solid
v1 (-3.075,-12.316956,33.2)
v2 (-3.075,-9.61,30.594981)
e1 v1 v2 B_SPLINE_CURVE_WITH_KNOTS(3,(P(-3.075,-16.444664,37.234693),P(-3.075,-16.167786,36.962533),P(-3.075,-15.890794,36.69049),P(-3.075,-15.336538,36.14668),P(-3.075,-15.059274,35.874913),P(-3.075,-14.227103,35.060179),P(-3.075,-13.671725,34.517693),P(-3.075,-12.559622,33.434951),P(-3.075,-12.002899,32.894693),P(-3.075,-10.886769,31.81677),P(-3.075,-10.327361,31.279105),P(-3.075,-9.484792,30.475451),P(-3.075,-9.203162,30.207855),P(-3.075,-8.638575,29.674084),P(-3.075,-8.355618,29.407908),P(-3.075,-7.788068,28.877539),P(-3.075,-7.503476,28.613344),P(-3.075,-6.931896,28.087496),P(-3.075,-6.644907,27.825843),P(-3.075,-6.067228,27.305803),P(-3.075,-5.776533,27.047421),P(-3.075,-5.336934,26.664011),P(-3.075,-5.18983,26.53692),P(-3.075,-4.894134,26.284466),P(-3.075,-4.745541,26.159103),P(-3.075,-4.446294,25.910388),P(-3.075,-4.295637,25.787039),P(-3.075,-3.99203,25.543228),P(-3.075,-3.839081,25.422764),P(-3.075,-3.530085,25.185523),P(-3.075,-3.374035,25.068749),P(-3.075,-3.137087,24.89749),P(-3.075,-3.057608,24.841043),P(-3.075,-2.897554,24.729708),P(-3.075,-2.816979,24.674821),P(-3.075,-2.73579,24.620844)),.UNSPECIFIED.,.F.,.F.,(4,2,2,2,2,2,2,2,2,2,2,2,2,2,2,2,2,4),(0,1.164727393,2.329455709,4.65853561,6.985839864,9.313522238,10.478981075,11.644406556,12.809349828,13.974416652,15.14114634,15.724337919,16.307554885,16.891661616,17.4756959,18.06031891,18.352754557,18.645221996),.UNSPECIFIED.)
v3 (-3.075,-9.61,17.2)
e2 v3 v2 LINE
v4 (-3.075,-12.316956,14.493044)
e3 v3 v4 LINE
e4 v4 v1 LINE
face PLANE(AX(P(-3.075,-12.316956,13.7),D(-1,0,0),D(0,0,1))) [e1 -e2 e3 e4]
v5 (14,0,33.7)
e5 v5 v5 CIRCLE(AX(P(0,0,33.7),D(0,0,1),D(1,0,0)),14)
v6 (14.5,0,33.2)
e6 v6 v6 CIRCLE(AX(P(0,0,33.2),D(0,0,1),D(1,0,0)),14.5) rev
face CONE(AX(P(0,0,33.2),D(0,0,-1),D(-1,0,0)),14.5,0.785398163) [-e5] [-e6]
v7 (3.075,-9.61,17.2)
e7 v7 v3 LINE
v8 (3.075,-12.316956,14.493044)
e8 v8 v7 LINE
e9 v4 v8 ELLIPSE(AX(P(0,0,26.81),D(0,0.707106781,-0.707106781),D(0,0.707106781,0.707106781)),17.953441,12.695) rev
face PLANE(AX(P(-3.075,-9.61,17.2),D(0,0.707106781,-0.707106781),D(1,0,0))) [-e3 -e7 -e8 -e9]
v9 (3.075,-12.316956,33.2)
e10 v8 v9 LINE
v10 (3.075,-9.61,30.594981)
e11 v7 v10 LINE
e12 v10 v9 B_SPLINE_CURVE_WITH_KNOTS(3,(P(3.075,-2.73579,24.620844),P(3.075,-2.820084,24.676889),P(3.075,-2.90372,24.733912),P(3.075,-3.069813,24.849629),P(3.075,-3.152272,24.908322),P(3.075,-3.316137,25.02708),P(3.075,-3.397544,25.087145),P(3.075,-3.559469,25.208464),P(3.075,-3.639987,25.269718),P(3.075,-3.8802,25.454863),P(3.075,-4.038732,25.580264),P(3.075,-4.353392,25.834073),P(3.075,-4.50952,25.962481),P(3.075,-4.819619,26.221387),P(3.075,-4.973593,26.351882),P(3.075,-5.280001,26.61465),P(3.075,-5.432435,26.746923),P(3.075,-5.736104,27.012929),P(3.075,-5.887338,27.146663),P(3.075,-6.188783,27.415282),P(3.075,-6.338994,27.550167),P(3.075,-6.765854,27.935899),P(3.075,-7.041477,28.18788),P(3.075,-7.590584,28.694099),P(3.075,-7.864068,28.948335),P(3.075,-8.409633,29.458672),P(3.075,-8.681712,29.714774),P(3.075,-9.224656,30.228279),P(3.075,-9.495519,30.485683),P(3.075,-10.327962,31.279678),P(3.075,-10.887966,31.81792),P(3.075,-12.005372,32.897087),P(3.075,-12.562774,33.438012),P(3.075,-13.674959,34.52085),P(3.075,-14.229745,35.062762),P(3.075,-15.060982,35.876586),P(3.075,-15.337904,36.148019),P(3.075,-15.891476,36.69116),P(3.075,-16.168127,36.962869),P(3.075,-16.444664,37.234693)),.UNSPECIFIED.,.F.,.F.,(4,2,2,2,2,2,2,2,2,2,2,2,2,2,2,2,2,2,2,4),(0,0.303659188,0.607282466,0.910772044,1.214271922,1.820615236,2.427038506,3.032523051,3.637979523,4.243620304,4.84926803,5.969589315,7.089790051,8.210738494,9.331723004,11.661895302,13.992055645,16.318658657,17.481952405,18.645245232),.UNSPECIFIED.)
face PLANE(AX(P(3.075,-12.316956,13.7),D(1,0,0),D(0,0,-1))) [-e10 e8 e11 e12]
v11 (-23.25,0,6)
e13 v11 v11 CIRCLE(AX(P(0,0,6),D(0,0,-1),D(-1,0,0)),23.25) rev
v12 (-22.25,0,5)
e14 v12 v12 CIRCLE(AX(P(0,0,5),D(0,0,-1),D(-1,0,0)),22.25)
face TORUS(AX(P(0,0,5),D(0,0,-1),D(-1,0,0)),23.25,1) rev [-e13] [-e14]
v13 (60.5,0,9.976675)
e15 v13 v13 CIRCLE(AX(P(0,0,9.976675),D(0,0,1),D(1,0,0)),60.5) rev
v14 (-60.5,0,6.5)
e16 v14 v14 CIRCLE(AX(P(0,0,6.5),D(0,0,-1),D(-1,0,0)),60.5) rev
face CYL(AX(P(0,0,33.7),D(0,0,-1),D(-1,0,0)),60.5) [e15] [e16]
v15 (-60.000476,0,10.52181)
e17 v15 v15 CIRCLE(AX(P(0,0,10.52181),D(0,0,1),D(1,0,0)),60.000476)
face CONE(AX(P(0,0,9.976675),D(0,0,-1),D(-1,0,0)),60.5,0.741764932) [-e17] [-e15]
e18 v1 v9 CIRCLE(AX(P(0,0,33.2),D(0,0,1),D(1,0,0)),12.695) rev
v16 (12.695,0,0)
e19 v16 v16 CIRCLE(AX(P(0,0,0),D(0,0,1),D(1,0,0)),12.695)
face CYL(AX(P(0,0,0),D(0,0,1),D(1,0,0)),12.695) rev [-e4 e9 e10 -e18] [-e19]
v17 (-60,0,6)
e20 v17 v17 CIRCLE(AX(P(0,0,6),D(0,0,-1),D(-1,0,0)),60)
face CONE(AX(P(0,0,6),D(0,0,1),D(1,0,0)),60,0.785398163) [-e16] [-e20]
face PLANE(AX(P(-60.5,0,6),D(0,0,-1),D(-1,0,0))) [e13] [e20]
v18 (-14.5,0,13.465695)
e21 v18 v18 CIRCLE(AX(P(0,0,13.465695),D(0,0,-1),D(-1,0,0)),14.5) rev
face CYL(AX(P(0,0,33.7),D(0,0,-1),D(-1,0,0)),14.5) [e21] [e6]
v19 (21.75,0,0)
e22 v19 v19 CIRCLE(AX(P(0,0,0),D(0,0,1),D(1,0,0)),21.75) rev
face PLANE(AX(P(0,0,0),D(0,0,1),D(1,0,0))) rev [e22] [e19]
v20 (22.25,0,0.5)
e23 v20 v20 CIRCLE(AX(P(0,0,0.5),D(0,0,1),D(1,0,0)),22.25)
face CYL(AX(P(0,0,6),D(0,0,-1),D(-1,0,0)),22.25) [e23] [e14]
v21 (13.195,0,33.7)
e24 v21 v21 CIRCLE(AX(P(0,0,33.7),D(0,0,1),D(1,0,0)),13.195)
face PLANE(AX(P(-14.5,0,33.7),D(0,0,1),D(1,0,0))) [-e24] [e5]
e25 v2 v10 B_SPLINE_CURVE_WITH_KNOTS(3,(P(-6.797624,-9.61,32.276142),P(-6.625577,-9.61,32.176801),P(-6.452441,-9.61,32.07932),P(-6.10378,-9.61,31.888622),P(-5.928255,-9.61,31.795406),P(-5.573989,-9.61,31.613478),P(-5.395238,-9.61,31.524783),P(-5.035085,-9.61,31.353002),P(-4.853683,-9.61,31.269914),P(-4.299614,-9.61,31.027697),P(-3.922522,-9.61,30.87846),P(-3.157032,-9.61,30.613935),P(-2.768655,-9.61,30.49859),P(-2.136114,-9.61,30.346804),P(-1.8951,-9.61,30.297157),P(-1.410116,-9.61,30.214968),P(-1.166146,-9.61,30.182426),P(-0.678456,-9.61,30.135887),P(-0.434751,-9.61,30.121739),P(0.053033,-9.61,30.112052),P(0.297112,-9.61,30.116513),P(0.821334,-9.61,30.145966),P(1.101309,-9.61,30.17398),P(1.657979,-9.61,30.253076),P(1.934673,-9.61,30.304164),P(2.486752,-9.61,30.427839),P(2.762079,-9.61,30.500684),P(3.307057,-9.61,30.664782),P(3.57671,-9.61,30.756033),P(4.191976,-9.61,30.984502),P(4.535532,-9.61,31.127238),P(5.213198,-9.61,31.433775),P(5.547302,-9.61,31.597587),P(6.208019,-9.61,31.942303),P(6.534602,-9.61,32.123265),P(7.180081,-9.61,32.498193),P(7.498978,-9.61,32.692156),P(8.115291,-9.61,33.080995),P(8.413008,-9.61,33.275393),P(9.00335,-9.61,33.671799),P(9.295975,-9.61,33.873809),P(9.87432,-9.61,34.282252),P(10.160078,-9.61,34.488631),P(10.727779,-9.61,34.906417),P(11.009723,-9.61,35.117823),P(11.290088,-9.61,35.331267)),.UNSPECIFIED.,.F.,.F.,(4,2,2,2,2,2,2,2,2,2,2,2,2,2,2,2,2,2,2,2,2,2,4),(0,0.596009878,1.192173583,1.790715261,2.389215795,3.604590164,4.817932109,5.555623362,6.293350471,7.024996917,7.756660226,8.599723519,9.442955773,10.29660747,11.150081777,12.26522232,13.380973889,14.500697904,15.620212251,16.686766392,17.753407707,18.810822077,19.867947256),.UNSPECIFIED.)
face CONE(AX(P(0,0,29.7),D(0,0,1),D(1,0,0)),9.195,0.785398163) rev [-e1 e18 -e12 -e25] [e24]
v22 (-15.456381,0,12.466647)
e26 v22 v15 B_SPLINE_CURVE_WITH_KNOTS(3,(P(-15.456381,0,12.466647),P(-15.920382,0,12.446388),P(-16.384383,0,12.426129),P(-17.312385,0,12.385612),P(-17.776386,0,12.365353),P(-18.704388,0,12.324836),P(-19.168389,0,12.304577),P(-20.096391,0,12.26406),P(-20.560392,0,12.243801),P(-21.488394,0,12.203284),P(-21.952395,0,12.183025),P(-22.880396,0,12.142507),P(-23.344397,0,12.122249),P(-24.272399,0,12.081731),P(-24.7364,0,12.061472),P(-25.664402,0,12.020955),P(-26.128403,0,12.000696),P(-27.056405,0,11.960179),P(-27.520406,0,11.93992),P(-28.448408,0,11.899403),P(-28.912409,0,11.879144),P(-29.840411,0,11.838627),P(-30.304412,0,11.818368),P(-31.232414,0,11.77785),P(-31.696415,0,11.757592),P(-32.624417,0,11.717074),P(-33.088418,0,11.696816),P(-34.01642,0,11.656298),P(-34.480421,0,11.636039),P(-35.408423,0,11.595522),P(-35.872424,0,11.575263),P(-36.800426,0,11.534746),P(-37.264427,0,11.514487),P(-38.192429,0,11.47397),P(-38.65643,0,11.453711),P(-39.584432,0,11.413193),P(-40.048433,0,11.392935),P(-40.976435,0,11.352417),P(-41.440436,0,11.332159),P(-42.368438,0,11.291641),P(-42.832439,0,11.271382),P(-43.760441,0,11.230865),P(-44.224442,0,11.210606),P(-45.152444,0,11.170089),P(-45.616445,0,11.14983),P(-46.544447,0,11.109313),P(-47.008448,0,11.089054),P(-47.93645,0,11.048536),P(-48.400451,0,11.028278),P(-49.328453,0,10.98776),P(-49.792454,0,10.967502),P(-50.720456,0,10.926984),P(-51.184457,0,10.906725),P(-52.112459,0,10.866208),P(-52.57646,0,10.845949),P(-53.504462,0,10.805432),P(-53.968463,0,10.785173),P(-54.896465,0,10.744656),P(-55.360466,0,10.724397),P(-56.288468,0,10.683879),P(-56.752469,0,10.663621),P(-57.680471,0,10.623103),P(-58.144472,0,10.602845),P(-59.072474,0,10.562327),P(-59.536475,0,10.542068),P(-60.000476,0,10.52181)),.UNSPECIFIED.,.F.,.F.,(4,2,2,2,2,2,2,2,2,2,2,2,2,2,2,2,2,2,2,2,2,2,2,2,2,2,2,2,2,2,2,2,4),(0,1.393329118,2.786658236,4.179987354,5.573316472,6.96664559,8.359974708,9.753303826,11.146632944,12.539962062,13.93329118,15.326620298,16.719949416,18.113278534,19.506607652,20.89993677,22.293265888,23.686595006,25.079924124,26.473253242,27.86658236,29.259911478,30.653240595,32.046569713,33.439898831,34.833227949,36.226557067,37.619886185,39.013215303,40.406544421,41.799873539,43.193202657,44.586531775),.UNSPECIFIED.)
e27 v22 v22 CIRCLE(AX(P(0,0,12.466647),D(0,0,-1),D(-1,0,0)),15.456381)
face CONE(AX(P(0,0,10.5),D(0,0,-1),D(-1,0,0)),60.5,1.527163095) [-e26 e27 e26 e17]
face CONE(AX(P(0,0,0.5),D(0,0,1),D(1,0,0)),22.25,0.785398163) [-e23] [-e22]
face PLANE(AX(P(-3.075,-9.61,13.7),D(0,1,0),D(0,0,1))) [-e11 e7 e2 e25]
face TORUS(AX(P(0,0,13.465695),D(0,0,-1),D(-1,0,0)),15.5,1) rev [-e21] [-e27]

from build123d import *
from OCP.BRepFilletAPI import BRepFilletAPI_MakeChamfer

# Parameters (mm, degrees)
SKETCH1_R           = 22.25
BOSS_EXTRUDE1_DEPTH = 6
FILLET1_R           = 1
SKETCH3_R           = 12.695
CUT_EXTRUDE1_DEPTH  = 92.957544552
CHAMFER1_SIZE       = 0.5
CHAMFER1_SIZE2      = 0.523325215
BOSS_EXTRUDE2_DEPTH = 20
CHAMFER2_SIZE       = 3.5
FILLET2_R           = 1


with BuildPart() as part:
    # Sketch1 → Boss-Extrude1 (new body)
    with BuildSketch(Plane.XY):
        Circle(SKETCH1_R)
    extrude(amount=BOSS_EXTRUDE1_DEPTH)

    # Sketch2 → Revolve1 (revolve)
    with BuildSketch(Plane(origin=(0, 0, 0), x_dir=(1, 0, 0), z_dir=(0, 1, 0))):
        Polygon((-14.5, -12.508403374), (-14.5, -33.7), (0, -33.7), (0, -6), (-60.5, -6), (-60.5, -10.5), align=None)
    revolve(axis=Axis((0, 0, 33.7), (0, 0, 1)))

    # Fillet1
    fillet1_edges = [part.edges().sort_by_distance(p)[0] for p in [
        (-22.25, 0, 6),
    ]]
    fillet(fillet1_edges, radius=FILLET1_R)

    # Sketch3 → Cut-Extrude1 (cut, through all)
    with BuildSketch(Plane.XY.offset(33.7)):
        Circle(SKETCH3_R)
    extrude(amount=-CUT_EXTRUDE1_DEPTH, mode=Mode.SUBTRACT)

    # Chamfer1: one chamfer whose edges measure the first distance from different faces: ONE call of the kernel's chamfer builder (chamfer() names one face for all edges)
    chamfer1_edges_1 = [part.edges().sort_by_distance(p)[0] for p in [
        (-22.25, 0, 0),
        (60.5, 0, 6),
        (14.5, 0, 33.7),
    ]]
    chamfer1_edges_2 = [part.edges().sort_by_distance(p)[0] for p in [
        (60.5, 0, 10.5),
    ]]
    chamfer1_side_2 = [part.faces().sort_by_distance(p)[0] for p in [
        (37.5, 0, 11.504201687),
    ]]
    chamfer1 = BRepFilletAPI_MakeChamfer(part.part.solid().wrapped)
    for e in chamfer1_edges_1:
        chamfer1.Add(CHAMFER1_SIZE, e.wrapped)
    for e in chamfer1_edges_2:
        chamfer1.Add(CHAMFER1_SIZE, CHAMFER1_SIZE2, e.wrapped, chamfer1_side_2[0].wrapped)  # the first distance lies on this face
    add(Compound.cast(chamfer1.Shape()), mode=Mode.REPLACE)

    # Sketch4 → Boss-Extrude2 (add)
    with BuildSketch(Plane.XY.offset(33.7)):
        with BuildLine():
            Line((-3.075, -12.316955793), (-3.075, -9.61))
            Line((-3.075, -9.61), (3.075, -9.61))
            Line((3.075, -9.61), (3.075, -12.316955793))
            ThreePointArc((3.075, -12.316955793), (0, -12.695), (-3.075, -12.316955793))
        make_face()
    extrude(amount=-BOSS_EXTRUDE2_DEPTH)

    # Sketch5 → Cut-Revolve1 (revolve, cut)
    with BuildSketch(Plane(origin=(0, 0, 0), x_dir=(1, 0, 0), z_dir=(0, 1, 0)), mode=Mode.PRIVATE) as cut_revolve1_sk:
        Polygon((-12.695, -33.2), (-13.195, -33.7), (-12.695, -33.7), align=None)
        Polygon((-9.195, -33.7), (-12.695, -33.7), (-12.695, -33.2), (-9.195, -29.7), align=None)
    revolve(cut_revolve1_sk.sketch.rotate(Axis((0, 0, 0), (0, 0, -1)), 180), axis=Axis((0, 0, 0), (0, 0, -1)), mode=Mode.SUBTRACT)

    # Chamfer2
    # the kernel refuses this chamfer: 3.5 mm, written as the material it takes off along each edge
    with BuildSketch(Plane(origin=(-12.075890458, -9.61, 13.7), x_dir=(0, -0.9996219169112968, -0.027495876610586605), z_dir=(1, 0, 0))) as chamfer2_piece_1_section:
        Polygon((CHAMFER2_SIZE * 0.999621916911, -CHAMFER2_SIZE * 0.0274958766106), (-CHAMFER2_SIZE * 0.0274958766106, -CHAMFER2_SIZE * 0.999621916911), (0, 0), align=None)
    chamfer2_piece_1 = extrude(amount=24.151780916, mode=Mode.PRIVATE)
    chamfer2_piece_1 = chamfer2_piece_1 & Plane(origin=(0, 0, 14.984613596), x_dir=(1, 0, 0), z_dir=(0, 0, 1)) * Cylinder(12.695, 63, mode=Mode.PRIVATE)
    add(chamfer2_piece_1, mode=Mode.SUBTRACT)

    # Fillet2
    fillet2_edges = [part.edges().sort_by_distance(p)[0] for p in [
        (14.5, 0, 12.508403374),
    ]]
    fillet(fillet2_edges, radius=FILLET2_R)


solid = part.part
